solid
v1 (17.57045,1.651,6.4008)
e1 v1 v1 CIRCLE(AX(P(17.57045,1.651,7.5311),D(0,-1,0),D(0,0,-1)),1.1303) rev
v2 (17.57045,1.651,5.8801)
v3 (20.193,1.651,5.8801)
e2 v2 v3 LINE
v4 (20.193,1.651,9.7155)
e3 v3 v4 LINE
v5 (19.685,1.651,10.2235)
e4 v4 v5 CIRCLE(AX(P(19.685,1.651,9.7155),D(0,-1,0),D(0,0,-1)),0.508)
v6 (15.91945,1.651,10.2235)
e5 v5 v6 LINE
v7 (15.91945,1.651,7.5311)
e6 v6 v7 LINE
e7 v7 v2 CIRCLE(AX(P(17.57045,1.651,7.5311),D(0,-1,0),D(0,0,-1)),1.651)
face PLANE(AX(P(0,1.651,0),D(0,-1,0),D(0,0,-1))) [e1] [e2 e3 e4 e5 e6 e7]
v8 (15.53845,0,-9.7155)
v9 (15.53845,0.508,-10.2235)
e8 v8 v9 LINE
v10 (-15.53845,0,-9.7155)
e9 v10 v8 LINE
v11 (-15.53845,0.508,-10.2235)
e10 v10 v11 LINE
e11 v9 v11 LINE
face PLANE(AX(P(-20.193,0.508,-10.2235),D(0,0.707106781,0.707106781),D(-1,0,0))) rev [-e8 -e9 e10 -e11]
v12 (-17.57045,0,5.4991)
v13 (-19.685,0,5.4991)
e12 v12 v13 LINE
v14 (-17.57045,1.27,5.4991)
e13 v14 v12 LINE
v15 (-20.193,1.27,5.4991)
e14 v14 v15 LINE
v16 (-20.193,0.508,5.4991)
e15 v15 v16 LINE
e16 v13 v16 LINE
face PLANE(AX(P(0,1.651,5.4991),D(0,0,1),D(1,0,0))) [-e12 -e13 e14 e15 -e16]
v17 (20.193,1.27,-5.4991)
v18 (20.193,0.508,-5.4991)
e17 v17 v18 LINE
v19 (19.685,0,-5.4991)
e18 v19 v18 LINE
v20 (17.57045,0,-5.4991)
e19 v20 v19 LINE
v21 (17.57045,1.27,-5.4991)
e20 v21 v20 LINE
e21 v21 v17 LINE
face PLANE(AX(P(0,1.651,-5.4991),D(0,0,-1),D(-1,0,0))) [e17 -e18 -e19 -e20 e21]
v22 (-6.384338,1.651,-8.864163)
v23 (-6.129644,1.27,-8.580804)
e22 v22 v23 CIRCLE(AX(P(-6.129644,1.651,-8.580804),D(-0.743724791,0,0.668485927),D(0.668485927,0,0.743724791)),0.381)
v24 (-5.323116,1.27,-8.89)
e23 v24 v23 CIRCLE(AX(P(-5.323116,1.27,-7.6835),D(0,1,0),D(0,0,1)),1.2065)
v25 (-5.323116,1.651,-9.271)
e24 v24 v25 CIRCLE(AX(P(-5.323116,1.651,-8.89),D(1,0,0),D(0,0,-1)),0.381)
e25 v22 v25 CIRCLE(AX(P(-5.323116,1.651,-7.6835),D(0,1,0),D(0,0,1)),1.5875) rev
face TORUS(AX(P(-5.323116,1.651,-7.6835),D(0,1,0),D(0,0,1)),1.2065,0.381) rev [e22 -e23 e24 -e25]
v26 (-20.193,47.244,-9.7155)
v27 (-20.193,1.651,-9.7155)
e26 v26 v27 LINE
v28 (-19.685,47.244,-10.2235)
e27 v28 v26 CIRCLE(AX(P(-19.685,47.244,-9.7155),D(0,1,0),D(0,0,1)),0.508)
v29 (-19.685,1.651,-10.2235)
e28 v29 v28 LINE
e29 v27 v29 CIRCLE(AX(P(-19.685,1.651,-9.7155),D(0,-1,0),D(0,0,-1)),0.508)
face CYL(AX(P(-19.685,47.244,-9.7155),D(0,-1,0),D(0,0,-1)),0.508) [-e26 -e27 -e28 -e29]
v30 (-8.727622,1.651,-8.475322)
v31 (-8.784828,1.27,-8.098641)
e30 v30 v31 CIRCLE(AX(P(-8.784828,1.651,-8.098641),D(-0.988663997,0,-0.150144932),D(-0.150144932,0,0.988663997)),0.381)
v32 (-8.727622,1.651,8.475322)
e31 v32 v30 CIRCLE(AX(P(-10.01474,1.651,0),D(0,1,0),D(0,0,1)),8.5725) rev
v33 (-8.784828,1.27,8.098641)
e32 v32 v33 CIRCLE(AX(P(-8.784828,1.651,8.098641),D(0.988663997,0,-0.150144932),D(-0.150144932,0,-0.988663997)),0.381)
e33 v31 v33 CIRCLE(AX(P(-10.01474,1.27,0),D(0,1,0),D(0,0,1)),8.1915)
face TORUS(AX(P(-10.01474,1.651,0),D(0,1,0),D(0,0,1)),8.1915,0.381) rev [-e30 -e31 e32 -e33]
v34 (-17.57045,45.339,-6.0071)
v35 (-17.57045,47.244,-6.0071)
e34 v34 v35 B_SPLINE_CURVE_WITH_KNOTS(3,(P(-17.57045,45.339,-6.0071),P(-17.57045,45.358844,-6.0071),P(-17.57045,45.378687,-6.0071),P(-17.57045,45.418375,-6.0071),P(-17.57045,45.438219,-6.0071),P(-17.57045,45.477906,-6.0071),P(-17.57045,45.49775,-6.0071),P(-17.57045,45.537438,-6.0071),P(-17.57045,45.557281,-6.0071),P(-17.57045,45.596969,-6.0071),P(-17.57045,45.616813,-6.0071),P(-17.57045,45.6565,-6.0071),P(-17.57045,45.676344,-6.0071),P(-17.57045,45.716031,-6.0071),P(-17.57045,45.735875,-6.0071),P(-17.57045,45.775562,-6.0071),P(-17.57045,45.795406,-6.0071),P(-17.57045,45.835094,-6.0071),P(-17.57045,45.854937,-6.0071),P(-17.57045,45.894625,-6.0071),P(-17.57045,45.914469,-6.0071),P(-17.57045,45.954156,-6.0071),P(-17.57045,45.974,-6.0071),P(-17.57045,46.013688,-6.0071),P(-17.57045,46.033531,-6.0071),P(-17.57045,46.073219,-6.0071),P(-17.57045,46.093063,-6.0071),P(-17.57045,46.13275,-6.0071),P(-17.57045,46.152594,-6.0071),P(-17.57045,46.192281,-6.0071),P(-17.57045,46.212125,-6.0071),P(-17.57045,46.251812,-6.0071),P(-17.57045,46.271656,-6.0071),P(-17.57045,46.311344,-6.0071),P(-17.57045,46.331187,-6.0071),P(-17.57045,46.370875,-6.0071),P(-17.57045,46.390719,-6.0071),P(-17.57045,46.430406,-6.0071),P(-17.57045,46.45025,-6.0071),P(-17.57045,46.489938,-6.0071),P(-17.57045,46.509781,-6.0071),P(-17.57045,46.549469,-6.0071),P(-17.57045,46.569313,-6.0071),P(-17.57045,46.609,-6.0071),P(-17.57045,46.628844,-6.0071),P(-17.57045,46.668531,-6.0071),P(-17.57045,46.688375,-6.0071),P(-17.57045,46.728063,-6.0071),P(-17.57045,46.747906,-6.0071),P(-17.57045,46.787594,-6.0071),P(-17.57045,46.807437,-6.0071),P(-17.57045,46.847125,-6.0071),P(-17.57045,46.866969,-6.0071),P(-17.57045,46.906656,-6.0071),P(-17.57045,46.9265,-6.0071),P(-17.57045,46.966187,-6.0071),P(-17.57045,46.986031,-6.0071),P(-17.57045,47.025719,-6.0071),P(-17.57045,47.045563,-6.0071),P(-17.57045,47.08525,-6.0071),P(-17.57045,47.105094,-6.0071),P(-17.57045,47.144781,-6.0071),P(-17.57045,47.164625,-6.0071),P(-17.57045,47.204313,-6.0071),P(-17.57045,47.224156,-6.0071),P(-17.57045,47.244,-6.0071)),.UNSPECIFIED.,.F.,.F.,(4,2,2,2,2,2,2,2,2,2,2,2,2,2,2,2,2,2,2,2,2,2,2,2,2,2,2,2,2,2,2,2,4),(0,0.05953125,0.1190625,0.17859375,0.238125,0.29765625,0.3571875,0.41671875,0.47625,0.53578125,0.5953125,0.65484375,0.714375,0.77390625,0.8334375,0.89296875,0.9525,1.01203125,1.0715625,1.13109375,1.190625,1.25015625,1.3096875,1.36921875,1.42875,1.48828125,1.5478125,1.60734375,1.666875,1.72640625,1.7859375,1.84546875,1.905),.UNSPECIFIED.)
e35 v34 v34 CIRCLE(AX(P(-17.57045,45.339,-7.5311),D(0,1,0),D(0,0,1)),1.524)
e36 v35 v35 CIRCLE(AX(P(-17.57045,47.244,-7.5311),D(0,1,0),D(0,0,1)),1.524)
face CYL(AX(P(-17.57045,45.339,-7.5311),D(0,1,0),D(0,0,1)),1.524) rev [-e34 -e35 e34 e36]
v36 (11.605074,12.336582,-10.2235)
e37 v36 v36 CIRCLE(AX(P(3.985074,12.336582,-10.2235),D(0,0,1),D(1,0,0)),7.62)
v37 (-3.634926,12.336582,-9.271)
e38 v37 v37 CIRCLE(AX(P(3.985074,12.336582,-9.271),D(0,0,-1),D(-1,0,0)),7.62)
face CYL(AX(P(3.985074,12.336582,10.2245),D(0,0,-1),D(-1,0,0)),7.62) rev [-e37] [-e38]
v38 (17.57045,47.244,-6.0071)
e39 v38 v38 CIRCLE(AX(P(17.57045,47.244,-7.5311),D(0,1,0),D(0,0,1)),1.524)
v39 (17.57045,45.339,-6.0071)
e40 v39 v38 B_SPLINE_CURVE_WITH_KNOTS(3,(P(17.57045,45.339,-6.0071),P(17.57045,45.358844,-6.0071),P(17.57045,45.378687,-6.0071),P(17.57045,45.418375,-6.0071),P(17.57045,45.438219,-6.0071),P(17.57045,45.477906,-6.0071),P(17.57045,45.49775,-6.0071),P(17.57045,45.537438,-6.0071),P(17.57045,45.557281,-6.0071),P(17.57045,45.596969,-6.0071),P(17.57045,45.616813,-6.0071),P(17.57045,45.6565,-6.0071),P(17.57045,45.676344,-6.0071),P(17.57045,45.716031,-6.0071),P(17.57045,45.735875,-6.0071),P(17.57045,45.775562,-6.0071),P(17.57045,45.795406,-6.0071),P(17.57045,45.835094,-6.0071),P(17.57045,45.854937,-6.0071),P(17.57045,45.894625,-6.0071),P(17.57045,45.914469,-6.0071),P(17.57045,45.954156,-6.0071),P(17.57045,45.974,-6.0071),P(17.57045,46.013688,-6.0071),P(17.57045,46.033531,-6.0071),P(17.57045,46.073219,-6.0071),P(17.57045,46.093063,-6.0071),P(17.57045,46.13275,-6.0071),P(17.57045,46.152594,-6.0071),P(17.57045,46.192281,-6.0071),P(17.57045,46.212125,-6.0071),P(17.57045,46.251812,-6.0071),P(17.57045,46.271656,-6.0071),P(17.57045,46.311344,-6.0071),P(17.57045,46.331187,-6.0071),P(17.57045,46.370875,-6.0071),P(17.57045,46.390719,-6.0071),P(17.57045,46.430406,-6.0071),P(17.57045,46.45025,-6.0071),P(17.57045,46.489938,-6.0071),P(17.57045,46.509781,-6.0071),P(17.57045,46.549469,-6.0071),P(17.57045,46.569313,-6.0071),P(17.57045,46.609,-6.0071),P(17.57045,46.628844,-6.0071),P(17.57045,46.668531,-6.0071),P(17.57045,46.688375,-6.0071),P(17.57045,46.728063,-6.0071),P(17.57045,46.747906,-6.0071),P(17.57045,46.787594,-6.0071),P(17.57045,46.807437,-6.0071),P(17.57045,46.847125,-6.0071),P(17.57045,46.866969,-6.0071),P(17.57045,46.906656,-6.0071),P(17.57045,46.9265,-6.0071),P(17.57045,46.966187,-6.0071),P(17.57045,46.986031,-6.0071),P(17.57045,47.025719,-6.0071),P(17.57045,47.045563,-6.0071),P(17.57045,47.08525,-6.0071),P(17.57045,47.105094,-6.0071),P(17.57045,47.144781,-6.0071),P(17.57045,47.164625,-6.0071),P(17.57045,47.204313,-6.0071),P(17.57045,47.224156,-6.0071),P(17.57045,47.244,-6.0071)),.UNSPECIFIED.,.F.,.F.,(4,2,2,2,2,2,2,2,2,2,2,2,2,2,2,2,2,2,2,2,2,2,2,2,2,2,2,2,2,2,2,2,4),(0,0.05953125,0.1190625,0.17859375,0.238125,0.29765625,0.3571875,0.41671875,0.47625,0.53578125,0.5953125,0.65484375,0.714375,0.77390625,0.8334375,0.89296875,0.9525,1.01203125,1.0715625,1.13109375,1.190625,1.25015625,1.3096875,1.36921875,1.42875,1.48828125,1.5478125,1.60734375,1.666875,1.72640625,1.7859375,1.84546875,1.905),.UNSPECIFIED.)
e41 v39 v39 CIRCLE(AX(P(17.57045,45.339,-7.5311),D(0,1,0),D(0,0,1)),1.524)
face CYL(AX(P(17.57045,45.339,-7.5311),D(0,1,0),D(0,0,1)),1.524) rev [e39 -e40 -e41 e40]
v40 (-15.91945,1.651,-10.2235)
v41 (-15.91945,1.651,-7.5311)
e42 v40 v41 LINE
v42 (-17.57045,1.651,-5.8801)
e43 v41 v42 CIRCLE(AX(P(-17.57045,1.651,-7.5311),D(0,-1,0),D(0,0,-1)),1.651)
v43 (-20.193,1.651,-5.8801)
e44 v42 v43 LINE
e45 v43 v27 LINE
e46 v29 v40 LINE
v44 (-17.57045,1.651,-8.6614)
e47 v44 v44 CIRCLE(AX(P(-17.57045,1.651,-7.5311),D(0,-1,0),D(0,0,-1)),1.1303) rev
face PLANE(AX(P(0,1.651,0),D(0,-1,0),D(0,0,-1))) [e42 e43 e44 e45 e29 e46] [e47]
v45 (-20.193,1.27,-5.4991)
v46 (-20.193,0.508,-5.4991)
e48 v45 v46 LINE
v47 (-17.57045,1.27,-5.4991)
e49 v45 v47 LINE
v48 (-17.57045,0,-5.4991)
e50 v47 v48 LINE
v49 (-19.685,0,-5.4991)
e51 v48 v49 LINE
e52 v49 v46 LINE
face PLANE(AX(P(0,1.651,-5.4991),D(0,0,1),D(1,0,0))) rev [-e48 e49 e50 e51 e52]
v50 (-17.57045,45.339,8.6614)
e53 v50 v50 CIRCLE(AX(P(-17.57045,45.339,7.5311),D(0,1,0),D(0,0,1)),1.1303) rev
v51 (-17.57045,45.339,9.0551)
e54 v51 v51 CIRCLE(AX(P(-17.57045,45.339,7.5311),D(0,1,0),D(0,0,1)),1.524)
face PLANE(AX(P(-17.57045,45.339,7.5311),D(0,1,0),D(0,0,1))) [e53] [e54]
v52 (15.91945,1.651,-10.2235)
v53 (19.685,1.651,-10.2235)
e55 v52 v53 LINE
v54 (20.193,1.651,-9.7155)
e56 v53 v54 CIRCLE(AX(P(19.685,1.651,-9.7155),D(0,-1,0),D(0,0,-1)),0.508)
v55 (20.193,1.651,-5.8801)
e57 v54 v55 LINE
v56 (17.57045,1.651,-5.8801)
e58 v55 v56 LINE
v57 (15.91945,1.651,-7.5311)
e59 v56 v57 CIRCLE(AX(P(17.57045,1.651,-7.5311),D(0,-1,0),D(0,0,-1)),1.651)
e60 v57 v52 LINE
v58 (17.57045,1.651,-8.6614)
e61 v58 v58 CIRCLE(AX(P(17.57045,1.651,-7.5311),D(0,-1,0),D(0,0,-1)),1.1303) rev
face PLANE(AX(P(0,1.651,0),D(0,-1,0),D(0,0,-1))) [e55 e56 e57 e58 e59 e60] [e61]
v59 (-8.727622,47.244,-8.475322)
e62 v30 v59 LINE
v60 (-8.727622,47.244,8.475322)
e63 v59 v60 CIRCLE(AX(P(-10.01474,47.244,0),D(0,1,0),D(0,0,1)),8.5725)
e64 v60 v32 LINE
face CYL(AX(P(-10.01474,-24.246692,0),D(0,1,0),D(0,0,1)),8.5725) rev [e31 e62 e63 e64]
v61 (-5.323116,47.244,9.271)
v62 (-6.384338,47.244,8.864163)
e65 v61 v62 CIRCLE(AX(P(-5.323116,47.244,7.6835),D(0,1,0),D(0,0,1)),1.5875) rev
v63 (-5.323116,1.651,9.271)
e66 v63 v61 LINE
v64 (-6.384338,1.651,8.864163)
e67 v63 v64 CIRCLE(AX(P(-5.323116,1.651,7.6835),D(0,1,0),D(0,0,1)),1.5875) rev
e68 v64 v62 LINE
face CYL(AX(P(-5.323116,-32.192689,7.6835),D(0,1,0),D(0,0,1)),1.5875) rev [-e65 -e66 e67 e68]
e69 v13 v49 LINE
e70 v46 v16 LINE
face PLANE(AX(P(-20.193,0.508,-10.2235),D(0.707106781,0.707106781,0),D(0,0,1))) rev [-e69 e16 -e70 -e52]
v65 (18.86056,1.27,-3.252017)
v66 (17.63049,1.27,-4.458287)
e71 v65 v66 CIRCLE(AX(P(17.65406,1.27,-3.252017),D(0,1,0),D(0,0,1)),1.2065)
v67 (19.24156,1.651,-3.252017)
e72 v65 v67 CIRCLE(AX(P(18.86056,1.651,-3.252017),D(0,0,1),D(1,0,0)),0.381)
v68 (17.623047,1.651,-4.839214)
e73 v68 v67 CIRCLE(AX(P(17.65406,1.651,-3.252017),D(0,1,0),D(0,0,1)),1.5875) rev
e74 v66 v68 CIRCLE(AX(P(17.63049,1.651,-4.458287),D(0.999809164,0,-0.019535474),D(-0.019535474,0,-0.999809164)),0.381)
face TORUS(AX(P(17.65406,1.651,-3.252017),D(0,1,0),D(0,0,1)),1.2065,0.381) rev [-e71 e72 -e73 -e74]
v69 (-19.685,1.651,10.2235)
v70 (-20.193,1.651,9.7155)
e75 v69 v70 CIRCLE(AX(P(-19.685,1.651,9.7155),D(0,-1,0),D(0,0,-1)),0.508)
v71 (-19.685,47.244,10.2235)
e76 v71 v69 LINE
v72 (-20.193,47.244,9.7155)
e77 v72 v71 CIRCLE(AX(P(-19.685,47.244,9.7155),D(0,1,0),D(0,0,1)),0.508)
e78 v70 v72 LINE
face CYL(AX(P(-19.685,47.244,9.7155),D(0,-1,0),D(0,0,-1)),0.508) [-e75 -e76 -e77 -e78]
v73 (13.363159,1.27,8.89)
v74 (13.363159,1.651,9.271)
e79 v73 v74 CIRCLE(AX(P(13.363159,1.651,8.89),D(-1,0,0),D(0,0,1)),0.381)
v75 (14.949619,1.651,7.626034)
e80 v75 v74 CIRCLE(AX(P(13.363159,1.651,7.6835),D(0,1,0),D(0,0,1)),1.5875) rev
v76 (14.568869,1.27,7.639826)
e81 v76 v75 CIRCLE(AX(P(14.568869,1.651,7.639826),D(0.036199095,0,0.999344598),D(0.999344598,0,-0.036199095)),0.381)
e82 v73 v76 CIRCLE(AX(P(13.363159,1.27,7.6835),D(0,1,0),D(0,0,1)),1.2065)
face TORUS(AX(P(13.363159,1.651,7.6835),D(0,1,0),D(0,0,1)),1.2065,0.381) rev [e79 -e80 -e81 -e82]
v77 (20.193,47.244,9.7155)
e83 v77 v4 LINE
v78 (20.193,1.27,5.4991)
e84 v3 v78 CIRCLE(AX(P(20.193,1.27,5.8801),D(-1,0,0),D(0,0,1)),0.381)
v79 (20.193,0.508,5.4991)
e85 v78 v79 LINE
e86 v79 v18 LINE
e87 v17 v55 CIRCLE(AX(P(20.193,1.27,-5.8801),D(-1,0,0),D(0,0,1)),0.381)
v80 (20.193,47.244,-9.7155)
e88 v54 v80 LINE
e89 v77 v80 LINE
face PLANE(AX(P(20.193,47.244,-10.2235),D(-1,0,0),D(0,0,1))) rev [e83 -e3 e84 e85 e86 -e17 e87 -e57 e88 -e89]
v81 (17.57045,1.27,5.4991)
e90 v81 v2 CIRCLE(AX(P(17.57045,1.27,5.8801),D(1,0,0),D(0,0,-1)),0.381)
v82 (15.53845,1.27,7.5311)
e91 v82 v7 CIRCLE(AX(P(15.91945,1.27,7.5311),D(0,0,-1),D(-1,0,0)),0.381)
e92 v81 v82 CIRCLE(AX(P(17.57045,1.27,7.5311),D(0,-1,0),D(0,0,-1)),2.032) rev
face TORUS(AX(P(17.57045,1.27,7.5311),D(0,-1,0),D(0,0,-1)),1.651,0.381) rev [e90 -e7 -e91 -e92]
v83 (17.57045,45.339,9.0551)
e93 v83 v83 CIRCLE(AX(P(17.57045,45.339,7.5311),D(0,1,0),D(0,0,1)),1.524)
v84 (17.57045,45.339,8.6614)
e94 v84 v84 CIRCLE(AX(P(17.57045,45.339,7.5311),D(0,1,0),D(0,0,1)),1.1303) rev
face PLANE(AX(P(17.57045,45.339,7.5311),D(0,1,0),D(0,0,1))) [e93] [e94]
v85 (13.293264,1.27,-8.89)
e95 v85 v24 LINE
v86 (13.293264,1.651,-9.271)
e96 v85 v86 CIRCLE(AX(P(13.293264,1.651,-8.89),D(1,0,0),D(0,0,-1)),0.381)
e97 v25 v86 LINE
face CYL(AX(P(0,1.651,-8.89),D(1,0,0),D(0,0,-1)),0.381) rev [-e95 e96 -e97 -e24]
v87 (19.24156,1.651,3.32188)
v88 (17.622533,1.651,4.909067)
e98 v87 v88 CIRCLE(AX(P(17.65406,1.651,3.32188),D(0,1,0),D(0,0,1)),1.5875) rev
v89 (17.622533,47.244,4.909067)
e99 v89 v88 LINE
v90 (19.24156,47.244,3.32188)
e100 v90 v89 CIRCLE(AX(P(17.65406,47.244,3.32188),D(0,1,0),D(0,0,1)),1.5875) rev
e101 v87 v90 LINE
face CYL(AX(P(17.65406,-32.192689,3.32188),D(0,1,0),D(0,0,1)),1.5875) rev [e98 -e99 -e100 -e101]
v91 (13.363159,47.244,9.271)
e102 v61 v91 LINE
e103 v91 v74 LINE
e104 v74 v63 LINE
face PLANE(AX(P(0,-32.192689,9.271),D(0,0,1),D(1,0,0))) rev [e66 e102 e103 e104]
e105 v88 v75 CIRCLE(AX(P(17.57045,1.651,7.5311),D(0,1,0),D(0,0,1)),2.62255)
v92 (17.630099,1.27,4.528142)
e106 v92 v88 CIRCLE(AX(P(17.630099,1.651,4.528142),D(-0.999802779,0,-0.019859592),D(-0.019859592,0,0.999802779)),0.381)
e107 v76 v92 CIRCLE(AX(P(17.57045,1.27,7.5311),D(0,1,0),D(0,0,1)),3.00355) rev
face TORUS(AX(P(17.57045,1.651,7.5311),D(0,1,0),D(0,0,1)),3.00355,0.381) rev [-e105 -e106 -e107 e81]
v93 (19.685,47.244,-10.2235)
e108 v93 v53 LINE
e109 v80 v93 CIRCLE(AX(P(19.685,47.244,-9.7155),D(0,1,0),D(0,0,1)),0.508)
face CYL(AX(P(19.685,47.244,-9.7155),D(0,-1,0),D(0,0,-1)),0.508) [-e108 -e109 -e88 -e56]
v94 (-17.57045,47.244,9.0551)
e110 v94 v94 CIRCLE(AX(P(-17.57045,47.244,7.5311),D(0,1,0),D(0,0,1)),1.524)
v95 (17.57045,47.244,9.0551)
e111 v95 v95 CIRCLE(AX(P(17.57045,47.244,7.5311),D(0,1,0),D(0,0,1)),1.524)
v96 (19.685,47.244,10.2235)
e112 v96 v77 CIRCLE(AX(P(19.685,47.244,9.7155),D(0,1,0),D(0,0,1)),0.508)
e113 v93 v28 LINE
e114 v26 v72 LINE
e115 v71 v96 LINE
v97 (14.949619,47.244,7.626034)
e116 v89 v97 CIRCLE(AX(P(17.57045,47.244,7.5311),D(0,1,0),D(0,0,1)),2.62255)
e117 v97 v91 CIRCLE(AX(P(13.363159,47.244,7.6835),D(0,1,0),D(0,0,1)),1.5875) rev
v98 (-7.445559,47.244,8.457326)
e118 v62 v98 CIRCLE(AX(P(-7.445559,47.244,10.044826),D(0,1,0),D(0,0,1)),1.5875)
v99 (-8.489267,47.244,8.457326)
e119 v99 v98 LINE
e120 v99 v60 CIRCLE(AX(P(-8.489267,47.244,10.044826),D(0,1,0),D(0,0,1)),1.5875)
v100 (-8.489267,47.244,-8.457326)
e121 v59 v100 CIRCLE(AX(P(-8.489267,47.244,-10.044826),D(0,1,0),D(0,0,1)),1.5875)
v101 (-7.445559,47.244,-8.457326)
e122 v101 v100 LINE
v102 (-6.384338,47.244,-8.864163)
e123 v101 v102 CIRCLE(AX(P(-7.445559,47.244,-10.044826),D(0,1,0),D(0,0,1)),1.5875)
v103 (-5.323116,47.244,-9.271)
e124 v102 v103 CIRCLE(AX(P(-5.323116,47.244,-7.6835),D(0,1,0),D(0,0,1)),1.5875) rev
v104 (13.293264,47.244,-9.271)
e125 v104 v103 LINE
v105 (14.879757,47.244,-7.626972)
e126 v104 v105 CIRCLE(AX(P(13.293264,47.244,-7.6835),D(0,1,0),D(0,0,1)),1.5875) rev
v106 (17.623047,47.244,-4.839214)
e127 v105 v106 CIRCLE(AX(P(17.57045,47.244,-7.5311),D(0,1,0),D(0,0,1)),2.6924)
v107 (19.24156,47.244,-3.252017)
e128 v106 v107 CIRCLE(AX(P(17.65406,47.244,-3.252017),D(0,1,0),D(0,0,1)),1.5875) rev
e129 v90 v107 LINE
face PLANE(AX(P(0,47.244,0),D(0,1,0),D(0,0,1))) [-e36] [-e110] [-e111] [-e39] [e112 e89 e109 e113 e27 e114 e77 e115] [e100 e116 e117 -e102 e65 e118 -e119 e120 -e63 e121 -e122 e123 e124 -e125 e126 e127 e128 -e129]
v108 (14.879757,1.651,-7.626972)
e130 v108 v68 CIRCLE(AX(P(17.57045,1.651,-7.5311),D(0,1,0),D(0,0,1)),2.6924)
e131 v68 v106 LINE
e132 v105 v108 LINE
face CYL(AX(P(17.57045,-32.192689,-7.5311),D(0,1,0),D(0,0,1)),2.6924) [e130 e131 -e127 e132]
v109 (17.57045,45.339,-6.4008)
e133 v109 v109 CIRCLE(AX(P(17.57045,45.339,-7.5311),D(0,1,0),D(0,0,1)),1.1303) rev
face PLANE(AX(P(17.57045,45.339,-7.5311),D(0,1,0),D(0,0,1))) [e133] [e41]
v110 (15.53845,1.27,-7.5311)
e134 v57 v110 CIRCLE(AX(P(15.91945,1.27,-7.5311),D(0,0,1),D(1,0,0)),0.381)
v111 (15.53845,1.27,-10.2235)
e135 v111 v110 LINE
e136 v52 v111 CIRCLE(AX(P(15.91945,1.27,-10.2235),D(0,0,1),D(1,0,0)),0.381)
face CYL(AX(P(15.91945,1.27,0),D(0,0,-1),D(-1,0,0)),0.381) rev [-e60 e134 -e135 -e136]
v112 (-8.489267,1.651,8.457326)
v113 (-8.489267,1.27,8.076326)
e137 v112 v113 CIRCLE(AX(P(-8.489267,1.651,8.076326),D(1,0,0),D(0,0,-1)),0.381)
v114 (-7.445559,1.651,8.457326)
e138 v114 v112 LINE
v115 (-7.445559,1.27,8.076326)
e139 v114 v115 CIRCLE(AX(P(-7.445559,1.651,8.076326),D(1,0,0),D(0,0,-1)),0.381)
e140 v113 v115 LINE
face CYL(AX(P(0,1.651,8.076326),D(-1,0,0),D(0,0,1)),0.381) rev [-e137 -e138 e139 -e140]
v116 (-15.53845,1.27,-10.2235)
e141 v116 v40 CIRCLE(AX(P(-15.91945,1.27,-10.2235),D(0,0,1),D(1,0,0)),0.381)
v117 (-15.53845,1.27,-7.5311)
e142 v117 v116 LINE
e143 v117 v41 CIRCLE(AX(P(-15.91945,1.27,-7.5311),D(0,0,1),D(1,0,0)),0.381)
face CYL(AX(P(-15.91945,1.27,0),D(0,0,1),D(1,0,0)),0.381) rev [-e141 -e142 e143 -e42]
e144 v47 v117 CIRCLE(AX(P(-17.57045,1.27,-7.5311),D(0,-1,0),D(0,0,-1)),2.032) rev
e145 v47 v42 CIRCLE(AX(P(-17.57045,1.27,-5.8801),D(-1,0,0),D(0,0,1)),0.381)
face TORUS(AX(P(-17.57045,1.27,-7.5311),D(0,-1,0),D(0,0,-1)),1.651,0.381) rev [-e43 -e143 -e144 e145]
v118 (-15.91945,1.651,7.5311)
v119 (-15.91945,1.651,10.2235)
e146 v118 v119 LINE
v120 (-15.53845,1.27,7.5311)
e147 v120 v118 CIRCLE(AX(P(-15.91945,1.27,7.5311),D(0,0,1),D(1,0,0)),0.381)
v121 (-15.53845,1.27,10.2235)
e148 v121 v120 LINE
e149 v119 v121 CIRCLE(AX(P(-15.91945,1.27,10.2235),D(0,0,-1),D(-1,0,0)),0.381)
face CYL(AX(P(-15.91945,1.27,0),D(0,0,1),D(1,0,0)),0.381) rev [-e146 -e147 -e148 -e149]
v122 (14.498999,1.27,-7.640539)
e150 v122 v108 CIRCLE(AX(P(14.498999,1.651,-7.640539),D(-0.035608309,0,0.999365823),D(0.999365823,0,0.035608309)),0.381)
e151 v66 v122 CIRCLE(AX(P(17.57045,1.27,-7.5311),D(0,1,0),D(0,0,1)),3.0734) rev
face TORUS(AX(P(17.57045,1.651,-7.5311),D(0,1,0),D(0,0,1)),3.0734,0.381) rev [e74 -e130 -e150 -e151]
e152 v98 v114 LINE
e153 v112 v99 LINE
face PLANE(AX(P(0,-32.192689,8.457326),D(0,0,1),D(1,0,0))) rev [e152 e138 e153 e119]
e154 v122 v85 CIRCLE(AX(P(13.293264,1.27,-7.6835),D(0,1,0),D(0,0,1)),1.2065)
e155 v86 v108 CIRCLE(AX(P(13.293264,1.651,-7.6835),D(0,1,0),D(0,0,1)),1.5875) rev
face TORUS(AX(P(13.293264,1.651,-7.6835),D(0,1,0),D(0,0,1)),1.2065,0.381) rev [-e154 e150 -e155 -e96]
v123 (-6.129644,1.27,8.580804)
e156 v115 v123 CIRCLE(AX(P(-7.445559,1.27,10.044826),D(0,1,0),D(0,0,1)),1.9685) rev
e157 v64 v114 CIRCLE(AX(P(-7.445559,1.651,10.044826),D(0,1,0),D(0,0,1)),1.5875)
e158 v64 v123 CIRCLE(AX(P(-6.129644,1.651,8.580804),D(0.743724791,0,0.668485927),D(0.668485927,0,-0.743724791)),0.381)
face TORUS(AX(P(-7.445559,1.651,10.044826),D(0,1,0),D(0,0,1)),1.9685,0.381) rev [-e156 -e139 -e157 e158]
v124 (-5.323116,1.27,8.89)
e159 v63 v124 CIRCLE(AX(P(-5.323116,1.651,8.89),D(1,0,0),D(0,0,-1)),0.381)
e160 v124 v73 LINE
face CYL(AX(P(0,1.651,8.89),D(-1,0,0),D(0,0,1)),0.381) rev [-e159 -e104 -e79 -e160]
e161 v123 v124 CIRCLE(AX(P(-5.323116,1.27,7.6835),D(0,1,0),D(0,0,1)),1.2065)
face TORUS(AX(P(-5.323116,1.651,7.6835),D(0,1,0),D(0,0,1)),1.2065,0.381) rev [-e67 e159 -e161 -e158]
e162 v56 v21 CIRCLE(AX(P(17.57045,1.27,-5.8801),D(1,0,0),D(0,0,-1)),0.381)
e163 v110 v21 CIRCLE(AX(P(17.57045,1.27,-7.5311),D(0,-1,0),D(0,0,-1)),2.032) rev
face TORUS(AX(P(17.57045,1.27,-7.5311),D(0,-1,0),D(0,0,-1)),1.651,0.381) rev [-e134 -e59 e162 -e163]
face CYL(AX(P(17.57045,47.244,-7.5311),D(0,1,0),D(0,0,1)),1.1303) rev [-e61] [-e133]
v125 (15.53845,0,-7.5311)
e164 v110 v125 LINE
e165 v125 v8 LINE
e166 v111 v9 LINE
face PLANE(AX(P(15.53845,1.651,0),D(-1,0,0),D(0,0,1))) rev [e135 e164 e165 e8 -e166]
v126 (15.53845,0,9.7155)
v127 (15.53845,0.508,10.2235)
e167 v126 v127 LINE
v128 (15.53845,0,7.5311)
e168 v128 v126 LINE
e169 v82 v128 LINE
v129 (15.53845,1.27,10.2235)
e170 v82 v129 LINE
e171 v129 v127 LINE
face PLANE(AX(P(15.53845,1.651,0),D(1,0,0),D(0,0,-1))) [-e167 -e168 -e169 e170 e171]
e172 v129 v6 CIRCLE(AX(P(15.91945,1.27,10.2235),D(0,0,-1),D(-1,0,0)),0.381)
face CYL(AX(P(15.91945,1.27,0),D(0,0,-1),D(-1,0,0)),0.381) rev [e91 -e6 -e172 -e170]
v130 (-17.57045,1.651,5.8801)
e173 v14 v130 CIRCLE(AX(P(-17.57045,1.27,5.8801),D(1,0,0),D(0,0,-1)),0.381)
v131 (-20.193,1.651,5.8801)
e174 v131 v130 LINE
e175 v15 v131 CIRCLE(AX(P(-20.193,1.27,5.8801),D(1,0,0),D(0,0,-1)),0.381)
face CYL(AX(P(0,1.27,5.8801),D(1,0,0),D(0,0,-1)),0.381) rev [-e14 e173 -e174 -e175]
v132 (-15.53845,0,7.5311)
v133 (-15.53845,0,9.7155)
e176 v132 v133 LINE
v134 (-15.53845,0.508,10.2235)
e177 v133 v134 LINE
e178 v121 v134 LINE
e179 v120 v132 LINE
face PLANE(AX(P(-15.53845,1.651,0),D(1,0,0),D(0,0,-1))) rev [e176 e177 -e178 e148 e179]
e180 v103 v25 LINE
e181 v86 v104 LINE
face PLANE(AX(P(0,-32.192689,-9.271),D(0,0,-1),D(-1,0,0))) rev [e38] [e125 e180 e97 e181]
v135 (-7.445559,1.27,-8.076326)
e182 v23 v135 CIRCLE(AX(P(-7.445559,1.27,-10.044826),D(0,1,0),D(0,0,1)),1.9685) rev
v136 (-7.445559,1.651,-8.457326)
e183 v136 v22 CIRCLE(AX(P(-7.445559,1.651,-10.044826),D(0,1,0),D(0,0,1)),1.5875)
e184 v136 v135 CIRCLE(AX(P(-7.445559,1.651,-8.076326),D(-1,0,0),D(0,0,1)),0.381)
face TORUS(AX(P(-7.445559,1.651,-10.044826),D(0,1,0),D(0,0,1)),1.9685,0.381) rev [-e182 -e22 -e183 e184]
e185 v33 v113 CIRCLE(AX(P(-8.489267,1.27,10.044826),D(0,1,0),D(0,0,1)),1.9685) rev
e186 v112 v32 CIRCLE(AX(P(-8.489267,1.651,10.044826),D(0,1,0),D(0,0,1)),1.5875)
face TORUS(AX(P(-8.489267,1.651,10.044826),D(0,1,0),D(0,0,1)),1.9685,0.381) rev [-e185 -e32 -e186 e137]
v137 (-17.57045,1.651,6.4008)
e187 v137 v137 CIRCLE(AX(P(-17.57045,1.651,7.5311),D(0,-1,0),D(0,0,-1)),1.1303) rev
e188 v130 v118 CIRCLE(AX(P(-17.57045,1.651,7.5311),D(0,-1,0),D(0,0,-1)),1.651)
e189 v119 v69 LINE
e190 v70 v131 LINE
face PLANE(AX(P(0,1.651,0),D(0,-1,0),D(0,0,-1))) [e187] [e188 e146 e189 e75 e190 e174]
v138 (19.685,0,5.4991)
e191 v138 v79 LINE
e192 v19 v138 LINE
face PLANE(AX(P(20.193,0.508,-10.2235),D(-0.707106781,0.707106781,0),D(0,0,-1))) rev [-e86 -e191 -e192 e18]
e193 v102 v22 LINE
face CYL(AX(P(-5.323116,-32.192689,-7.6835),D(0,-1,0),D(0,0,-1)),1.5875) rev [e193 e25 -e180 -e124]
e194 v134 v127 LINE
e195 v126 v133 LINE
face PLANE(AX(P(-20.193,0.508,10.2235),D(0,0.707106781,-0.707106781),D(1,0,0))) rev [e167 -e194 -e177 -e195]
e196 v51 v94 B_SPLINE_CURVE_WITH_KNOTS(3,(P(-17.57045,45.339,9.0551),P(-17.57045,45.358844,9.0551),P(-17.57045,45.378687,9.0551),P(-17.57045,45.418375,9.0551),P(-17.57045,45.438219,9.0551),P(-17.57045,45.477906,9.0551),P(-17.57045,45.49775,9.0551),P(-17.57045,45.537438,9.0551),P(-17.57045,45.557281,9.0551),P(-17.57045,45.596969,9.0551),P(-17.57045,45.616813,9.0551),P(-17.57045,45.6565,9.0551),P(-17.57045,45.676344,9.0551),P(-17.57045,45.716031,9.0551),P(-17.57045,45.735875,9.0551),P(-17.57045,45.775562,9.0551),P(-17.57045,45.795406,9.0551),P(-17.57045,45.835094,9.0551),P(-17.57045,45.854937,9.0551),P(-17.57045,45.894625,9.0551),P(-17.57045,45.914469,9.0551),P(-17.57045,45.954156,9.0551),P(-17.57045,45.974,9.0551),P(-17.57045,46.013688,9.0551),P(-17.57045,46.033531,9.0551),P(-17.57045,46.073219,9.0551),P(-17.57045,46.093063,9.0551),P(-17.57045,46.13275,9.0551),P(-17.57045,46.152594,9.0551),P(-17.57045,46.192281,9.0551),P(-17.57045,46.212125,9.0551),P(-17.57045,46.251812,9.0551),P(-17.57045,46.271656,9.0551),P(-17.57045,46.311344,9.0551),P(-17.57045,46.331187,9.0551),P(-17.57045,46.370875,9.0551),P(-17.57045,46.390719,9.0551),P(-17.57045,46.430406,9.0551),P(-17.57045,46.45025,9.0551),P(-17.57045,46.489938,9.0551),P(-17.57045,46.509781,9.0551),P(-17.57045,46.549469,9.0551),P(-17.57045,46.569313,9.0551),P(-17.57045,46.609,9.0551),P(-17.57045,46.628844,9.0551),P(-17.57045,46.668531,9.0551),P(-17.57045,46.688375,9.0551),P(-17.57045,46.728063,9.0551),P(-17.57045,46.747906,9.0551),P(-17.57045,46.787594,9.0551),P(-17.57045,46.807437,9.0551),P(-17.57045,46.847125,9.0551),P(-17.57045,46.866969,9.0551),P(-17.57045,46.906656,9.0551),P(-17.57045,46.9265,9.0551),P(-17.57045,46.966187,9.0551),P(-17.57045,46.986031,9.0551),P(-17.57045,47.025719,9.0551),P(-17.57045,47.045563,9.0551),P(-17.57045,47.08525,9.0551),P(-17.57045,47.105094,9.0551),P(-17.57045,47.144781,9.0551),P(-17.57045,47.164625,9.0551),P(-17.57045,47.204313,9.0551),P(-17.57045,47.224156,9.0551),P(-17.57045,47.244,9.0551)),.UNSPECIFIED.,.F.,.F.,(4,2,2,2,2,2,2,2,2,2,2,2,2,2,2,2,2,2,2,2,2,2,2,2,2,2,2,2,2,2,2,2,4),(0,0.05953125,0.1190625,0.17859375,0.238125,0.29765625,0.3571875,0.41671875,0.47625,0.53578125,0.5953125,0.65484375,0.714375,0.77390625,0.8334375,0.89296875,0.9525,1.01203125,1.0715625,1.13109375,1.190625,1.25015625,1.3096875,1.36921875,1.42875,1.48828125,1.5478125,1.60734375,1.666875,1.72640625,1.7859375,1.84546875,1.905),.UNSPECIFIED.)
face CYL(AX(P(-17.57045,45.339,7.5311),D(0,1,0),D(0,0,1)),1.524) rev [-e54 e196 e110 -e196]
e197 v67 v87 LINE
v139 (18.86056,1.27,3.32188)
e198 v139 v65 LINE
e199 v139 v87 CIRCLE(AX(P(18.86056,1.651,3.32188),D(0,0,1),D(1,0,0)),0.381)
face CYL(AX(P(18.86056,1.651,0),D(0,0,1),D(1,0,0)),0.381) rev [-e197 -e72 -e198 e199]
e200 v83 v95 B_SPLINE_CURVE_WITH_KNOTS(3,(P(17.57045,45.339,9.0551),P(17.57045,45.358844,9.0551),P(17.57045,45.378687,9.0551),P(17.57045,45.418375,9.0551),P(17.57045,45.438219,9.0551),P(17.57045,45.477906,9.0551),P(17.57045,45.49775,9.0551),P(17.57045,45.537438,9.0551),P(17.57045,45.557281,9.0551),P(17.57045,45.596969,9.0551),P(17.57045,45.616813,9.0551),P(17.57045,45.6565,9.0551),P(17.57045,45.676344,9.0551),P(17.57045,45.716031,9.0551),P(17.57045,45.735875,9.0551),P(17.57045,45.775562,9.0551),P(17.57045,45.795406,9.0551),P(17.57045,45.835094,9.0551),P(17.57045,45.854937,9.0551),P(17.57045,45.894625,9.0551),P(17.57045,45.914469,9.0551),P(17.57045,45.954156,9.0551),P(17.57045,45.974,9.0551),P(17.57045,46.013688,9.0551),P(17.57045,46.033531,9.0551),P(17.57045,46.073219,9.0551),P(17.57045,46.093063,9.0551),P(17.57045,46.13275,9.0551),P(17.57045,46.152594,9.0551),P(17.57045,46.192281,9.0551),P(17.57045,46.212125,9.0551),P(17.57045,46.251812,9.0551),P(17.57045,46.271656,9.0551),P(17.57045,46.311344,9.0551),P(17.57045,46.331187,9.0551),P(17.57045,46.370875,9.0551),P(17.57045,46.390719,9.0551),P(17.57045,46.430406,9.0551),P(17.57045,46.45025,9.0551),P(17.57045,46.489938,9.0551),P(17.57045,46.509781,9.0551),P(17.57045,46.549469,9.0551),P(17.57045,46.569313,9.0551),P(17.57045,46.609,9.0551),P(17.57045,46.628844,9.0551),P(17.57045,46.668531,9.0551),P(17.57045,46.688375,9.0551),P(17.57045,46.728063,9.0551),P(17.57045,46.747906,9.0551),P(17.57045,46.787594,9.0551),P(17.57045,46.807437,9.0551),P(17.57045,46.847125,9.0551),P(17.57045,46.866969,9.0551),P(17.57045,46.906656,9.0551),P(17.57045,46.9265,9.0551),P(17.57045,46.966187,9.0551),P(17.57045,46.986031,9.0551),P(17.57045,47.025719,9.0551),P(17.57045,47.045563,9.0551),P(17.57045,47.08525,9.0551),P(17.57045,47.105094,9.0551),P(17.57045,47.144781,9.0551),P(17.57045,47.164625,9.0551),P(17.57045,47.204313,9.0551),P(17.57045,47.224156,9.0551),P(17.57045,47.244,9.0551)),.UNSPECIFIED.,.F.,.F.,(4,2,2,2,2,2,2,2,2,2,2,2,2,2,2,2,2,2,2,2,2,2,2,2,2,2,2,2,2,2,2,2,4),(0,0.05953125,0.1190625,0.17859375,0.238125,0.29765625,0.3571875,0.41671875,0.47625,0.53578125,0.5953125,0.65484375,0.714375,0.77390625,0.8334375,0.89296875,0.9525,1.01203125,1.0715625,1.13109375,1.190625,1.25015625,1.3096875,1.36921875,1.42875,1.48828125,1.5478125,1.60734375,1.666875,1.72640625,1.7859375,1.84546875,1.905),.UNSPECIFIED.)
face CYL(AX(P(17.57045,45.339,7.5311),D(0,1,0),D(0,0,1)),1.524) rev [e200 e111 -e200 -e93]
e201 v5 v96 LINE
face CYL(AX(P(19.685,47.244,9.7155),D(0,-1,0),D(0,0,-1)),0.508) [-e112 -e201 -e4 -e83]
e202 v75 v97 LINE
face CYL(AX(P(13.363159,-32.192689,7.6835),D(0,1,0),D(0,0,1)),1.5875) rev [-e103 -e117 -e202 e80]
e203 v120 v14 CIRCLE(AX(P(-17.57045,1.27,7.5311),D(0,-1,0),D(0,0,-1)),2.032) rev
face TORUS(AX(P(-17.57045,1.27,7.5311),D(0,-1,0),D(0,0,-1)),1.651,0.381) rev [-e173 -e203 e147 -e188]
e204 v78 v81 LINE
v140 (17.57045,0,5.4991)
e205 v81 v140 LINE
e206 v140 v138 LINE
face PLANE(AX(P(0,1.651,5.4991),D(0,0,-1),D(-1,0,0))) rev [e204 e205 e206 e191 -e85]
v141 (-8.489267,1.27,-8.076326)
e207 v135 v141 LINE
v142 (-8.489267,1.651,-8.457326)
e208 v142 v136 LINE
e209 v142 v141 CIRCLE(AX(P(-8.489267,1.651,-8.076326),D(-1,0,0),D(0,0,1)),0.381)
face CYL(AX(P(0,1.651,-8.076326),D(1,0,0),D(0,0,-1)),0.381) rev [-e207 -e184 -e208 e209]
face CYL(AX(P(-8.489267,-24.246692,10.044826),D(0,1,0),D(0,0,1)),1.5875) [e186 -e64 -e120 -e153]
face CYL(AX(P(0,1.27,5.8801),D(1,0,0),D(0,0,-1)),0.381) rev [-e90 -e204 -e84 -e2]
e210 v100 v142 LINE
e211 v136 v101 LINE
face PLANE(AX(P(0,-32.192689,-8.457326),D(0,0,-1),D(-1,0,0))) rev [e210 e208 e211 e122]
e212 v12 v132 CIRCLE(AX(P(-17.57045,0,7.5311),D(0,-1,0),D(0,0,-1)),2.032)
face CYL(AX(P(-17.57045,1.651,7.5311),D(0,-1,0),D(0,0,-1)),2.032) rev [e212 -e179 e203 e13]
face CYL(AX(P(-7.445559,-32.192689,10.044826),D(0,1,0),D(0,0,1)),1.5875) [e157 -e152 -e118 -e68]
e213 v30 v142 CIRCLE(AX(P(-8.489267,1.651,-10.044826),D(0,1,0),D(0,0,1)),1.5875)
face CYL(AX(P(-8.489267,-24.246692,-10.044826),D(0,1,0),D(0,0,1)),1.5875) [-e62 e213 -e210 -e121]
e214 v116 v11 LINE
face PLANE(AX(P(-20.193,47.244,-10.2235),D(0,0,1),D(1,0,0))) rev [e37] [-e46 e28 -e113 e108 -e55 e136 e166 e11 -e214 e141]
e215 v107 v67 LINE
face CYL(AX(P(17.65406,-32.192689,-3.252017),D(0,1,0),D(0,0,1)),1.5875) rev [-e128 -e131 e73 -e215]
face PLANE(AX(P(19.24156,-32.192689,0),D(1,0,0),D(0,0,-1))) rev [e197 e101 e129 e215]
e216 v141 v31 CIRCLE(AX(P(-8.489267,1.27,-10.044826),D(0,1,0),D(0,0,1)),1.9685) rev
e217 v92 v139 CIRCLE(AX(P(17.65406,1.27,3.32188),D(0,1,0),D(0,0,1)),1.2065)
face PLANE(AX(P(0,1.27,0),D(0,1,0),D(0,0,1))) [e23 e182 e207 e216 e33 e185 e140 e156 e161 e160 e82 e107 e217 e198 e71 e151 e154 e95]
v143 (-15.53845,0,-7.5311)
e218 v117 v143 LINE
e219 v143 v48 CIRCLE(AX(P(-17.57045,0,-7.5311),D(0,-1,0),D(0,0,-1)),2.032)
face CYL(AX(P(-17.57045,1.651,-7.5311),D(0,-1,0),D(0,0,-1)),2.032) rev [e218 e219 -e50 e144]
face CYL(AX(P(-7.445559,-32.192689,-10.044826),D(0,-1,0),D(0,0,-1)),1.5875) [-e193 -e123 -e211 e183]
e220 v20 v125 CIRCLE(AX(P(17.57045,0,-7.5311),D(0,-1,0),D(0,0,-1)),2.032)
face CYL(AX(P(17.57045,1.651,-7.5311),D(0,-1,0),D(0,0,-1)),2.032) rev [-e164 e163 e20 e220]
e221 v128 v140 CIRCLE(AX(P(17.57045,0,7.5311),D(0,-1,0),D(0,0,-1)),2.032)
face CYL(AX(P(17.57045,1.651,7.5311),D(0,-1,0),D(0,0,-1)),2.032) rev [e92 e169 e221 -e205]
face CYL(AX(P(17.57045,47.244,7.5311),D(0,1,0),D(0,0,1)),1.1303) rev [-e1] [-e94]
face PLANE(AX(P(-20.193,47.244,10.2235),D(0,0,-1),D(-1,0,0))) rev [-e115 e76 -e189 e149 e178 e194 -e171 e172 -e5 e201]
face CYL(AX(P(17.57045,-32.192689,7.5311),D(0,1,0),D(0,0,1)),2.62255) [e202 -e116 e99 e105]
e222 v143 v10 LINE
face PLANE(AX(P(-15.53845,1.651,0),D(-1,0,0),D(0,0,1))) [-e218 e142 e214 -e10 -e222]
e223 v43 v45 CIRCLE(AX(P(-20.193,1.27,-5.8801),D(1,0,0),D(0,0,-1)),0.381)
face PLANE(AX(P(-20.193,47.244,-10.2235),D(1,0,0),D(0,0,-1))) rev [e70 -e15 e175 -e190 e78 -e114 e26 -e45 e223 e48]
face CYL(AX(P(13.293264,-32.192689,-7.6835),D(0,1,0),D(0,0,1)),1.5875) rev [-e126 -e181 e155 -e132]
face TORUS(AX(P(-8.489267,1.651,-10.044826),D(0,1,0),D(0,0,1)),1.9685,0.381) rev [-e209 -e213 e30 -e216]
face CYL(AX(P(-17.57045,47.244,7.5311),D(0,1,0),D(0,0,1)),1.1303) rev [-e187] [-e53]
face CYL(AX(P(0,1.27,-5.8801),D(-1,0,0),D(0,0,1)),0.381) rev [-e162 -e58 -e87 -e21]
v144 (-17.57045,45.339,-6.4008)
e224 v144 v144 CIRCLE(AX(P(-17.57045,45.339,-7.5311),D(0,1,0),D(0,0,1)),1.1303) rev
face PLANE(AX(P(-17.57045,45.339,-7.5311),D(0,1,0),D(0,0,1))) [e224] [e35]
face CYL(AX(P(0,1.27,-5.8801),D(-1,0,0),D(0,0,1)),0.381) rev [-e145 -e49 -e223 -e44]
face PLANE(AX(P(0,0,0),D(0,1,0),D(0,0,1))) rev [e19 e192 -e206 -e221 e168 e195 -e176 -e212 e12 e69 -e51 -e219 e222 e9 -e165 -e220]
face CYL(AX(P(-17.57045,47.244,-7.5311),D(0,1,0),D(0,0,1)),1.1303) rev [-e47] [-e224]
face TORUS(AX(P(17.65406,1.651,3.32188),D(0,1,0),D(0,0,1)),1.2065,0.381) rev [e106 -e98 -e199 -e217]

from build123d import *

# Parameters (mm, degrees)
SKETCH1_W             = 40.386
SKETCH1_H             = 20.447
BOSS_EXTRUDE1_DEPTH   = 47.244
FILLET1_R             = 0.508
CHAMFER1_SIZE         = 0.508
F_2_CLEARANCE_HOLE1_D = 2.2606
SKETCH6_R             = 8.5725
CUT_EXTRUDE1_DEPTH    = 45.974
SKETCH8_R             = 1.524
CUT_EXTRUDE2_DEPTH    = 1.905
CUT_EXTRUDE4_DEPTH    = 45.974
FILLET3_R             = 1.5875
FILLET6_R             = 1.5875
FILLET4_R             = 0.381
SKETCH9_R             = 1.1303
CUT_EXTRUDE5_DEPTH    = 1.651
FILLET5_R             = 0.381
CUT_EXTRUDE8_REACH    = 61.664
SKETCH12_R            = 7.62


with BuildPart() as part:
    # Sketch1 → Boss-Extrude1 (new body)
    with BuildSketch(Plane(origin=(0, 0, 0), x_dir=(1, 0, 0), z_dir=(0, 1, 0))):
        Rectangle(SKETCH1_W, SKETCH1_H)
    extrude(amount=BOSS_EXTRUDE1_DEPTH)

    # Fillet1
    fillet1_edges = [part.edges().sort_by_distance(p)[0] for p in [
        (20.193, 23.622, 10.2235),
        (-20.193, 23.622, 10.2235),
        (-20.193, 23.622, -10.2235),
        (20.193, 23.622, -10.2235),
    ]]
    fillet(fillet1_edges, radius=FILLET1_R)

    # Chamfer1
    chamfer1_edges = [part.edges().sort_by_distance(p)[0] for p in [
        (20.193, 0, 0),
        (0, 0, 10.2235),
        (-20.193, 0, 0),
        (0, 0, -10.2235),
        (-20.044210245, 0, 10.074710245),
        (-20.044210245, 0, -10.074710245),
        (20.044210245, 0, -10.074710245),
        (20.044210245, 0, 10.074710245),
    ]]
    chamfer(chamfer1_edges, length=CHAMFER1_SIZE)

    # #2 Clearance Hole1 (through all)
    with Locations(Plane(origin=(0, 47.244, 0), x_dir=(1, 0, 0), z_dir=(0, 1, 0))):
        with Locations((17.57045, -7.5311), (-17.57045, 7.5311), (-17.57045, -7.5311), (17.57045, 7.5311)):
            Hole(F_2_CLEARANCE_HOLE1_D / 2)

    # Sketch6 → Cut-Extrude1 (cut)
    with BuildSketch(Plane(origin=(0, 47.244, 0), x_dir=(1, 0, 0), z_dir=(0, 1, 0))):
        with Locations(Location((-10.014739789, 0, 0), (0, 0, 270))):
            Circle(SKETCH6_R)
    extrude(amount=-CUT_EXTRUDE1_DEPTH, mode=Mode.SUBTRACT)

    # Sketch8 → Cut-Extrude2 (cut)
    with BuildSketch(Plane(origin=(0, 47.244, 0), x_dir=(1, 0, 0), z_dir=(0, 1, 0))):
        with Locations(Location((-17.57045, -7.5311, 0), (0, 0, 270))):
            Circle(SKETCH8_R)
        with Locations(Location((-17.57045, 7.5311, 0), (0, 0, 270))):
            Circle(SKETCH8_R)
        with Locations(Location((17.57045, 7.5311, 0), (0, 0, 270))):
            Circle(SKETCH8_R)
        with Locations(Location((17.57045, -7.5311, 0), (0, 0, 270))):
            Circle(SKETCH8_R)
    extrude(amount=-CUT_EXTRUDE2_DEPTH, mode=Mode.SUBTRACT)

    # Sketch10 → Cut-Extrude4 (cut)
    with BuildSketch(Plane(origin=(0, 47.244, 0), x_dir=(1, 0, 0), z_dir=(0, 1, 0))):
        with BuildLine():
            Line((-6.70924359, 8.457326211), (-8.61424359, 8.457326211))
            ThreePointArc((-8.61424359, 8.457326211), (-3.476639533, 5.544456808), (-1.442239789, 0))
            ThreePointArc((-1.442239789, 0), (-3.476639533, -5.544456808), (-8.61424359, -8.457326211))
            Line((-8.61424359, -8.457326211), (-6.70924359, -8.457326211))
            Line((-6.70924359, -8.457326211), (-6.70924359, -9.271))
            Line((-6.70924359, -9.271), (15.608176703, -9.271))
            ThreePointArc((15.608176703, -9.271), (15.68428435, -5.70897277), (19.241559877, -5.509922056))
            Line((19.241559877, -5.509922056), (19.241559877, 5.420079029))
            ThreePointArc((19.241559877, 5.420079029), (15.63546106, 5.658979394), (15.51575641, 9.271))
            Line((15.51575641, 9.271), (-6.70924359, 9.271))
            Line((-6.70924359, 9.271), (-6.70924359, 8.457326211))
        make_face()
    extrude(amount=-CUT_EXTRUDE4_DEPTH, mode=Mode.SUBTRACT)

    # Fillet3
    # the kernel refuses this fillet: 1.5875 mm, written as the material it adds along each edge
    with BuildSketch(Plane(origin=(-6.70924359, 47.244, -9.271), x_dir=(0, 0, 1), z_dir=(0, -1, 0))) as fillet3_piece_1:
        with BuildLine():
            CenterArc((1.5875, -1.386127427), FILLET3_R, 119.173087397, 60.826912603)
            Line((0, -1.386127427), (0, 0))
            Line((0, 0), (0.813673789, 0))
        make_face()
    extrude(amount=45.974)
    with BuildSketch(Plane(origin=(-6.70924359, 47.244, 9.271), x_dir=(1, 0, 0), z_dir=(0, -1, 0))) as fillet3_piece_2:
        with BuildLine():
            CenterArc((1.386127427, -1.5875), FILLET3_R, 90, 60.826912603)
            Line((0, -0.813673789), (0, 0))
            Line((0, 0), (1.386127427, 0))
        make_face()
    extrude(amount=45.974)
    with BuildSketch(Plane(origin=(15.608176703, 47.244, 9.271), x_dir=(-0.3716686851547393, 0, -0.9283654390784629), z_dir=(0, -1, 0))) as fillet3_piece_3:
        with BuildLine():
            CenterArc((2.30818281, -1.494172552), FILLET3_R, 109.744057683, 92.074508599)
            Line((0.834402675, -2.08419659), (0, 0))
            ThreePointArc((0, 0), (0.885947491, -0.154176944), (1.771894982, 0))
        make_face()
    extrude(amount=45.974)
    with BuildSketch(Plane(origin=(19.241559877, 47.244, 5.509922056), x_dir=(0, 0, -1), z_dir=(0, -1, 0))) as fillet3_piece_4:
        with BuildLine():
            CenterArc((2.188041745, -1.5875), FILLET3_R, 90, 91.137945638)
            ThreePointArc((0.600854834, -1.619027103), (0.437513505, -0.758638036), (0, 0))
            Line((0, 0), (2.188041745, 0))
        make_face()
    extrude(amount=45.974)
    with BuildSketch(Plane(origin=(19.241559877, 47.244, -5.420079029), x_dir=(-0.9412204258380975, 0, 0.3377929987213328), z_dir=(0, -1, 0))) as fillet3_piece_5:
        with BuildLine():
            CenterArc((2.226543682, -1.504378109), FILLET3_R, 108.623097103, 91.119371442)
            Line((0.732356256, -2.040624495), (0, 0))
            ThreePointArc((0, 0), (0.859794646, -0.140974726), (1.719589292, 0))
        make_face()
    extrude(amount=45.974)
    with BuildSketch(Plane(origin=(15.51575641, 47.244, -9.271), x_dir=(-1, 0, 0), z_dir=(0, -1, 0))) as fillet3_piece_6:
        with BuildLine():
            CenterArc((2.222492196, -1.5875), FILLET3_R, 90, 92.040637192)
            ThreePointArc((0.635998952, -1.64402819), (0.456357894, -0.768489581), (0, 0))
            Line((0, 0), (2.222492196, 0))
        make_face()
    extrude(amount=45.974)
    # the kernel refuses this fillet: 1.5875 mm, written as the material it takes off along each edge
    with BuildSketch(Plane(origin=(-8.61424359, 47.55644078, -8.457326211), x_dir=(1, 0, 0), z_dir=(0, -1, 0))) as fillet3_2_piece_1:
        with BuildLine():
            CenterArc((0.124976312, -1.5875), FILLET3_R, 90, 8.635325681)
            ThreePointArc((-0.113378768, -0.017995904), (-0.05665926, -0.009187742), (0, 0))
            Line((0, 0), (0.124976312, 0))
        make_face()
    extrude(amount=46.28644078, mode=Mode.SUBTRACT)
    with BuildSketch(Plane(origin=(-8.61424359, 47.55644078, 8.457326211), x_dir=(-0.9876365067196718, 0, 0.15676138106869192), z_dir=(0, -1, 0))) as fillet3_2_piece_2:
        with BuildLine():
            CenterArc((0.125427524, -1.587464414), FILLET3_R, 90.383639208, 8.635325681)
            Line((-0.123431168, -0.019591459), (0, 0))
            ThreePointArc((0, 0), (0.057399036, -0.000192166), (0.114798073, 0))
        make_face()
    extrude(amount=46.28644078, mode=Mode.SUBTRACT)

    # Fillet6
    fillet6_edges = [part.edges().sort_by_distance(p)[0] for p in [
        (-6.70924359, 24.257, 8.457326211),
        (-6.70924359, 24.257, -8.457326211),
    ]]
    fillet(fillet6_edges, radius=FILLET6_R)

    # Fillet4
    fillet4_edges = [part.edges().sort_by_distance(p)[0] for p in [
        (3.985074025, 1.27, -9.271),
        (-18.587239789, 1.27, 0),
        (4.020021556, 1.27, 9.271),
        (15.700932918, 1.27, 5.691895176),
        (19.241559877, 1.27, 0.034931777),
        (15.651391563, 1.27, -5.642652893),
        (-7.967413131, 1.27, -8.457326211),
        (14.435607146, 1.27, -8.785865127),
        (18.765573215, 1.27, -4.385460337),
        (18.76538948, 1.27, 4.455504042),
        (14.505827999, 1.27, 8.785527421),
        (-5.891382637, 1.27, -9.165805456),
        (-8.60878401, 1.27, -8.461831581),
        (-8.60878401, 1.27, 8.461831581),
        (-5.891382637, 1.27, 9.165805456),
        (-7.967413131, 1.27, 8.457326211),
        (-6.877292509, 1.27, 8.562520755),
        (-6.877292509, 1.27, -8.562520755),
    ]]
    fillet(fillet4_edges, radius=FILLET4_R)

    # Sketch9 → Cut-Extrude5 (cut)
    # profile 1 of 8: a face of its own
    with BuildSketch(Plane.XZ):
        with BuildLine():
            Line((-19.685, 9.7155), (-19.685, 5.4991))
            Line((-19.685, 5.4991), (-17.57045, 5.4991))
            ThreePointArc((-17.57045, 5.4991), (-16.133609021, 6.094259021), (-15.53845, 7.5311))
            Line((-15.53845, 7.5311), (-15.53845, 9.7155))
            Line((-15.53845, 9.7155), (-19.685, 9.7155))
        make_face()
        with Locations(Location((-17.57045, 7.5311, 0), (0, 0, 90))):
            Circle(SKETCH9_R, mode=Mode.SUBTRACT)
    # profile 2 of 8: a face of its own
    with BuildSketch(Plane.XZ):
        with BuildLine():
            Line((-20.193, 5.4991), (-19.685, 5.4991))
            Line((-19.685, 5.4991), (-19.685, 9.7155))
            Line((-19.685, 9.7155), (-15.53845, 9.7155))
            Line((-15.53845, 9.7155), (-15.53845, 10.2235))
            Line((-15.53845, 10.2235), (-19.685, 10.2235))
            ThreePointArc((-19.685, 10.2235), (-20.044210245, 10.074710245), (-20.193, 9.7155))
            Line((-20.193, 9.7155), (-20.193, 5.4991))
        make_face()
    # profile 3 of 8: a face of its own
    with BuildSketch(Plane.XZ):
        with BuildLine():
            ThreePointArc((-15.53845, -7.5311), (-16.133609021, -6.094259021), (-17.57045, -5.4991))
            Line((-17.57045, -5.4991), (-19.685, -5.4991))
            Line((-19.685, -5.4991), (-19.685, -9.7155))
            Line((-19.685, -9.7155), (-15.53845, -9.7155))
            Line((-15.53845, -9.7155), (-15.53845, -7.5311))
        make_face()
        with Locations(Location((-17.57045, -7.5311, 0), (0, 0, 90))):
            Circle(SKETCH9_R, mode=Mode.SUBTRACT)
    # profile 4 of 8: a face of its own
    with BuildSketch(Plane.XZ):
        with BuildLine():
            Line((-19.685, -9.7155), (-19.685, -5.4991))
            Line((-19.685, -5.4991), (-20.193, -5.4991))
            Line((-20.193, -5.4991), (-20.193, -9.7155))
            ThreePointArc((-20.193, -9.7155), (-20.044210245, -10.074710245), (-19.685, -10.2235))
            Line((-19.685, -10.2235), (-15.53845, -10.2235))
            Line((-15.53845, -10.2235), (-15.53845, -9.7155))
            Line((-15.53845, -9.7155), (-19.685, -9.7155))
        make_face()
    # profile 5 of 8: a face of its own
    with BuildSketch(Plane.XZ):
        with BuildLine():
            Line((19.685, 9.7155), (15.53845, 9.7155))
            Line((15.53845, 9.7155), (15.53845, 7.5311))
            ThreePointArc((15.53845, 7.5311), (16.133609021, 6.094259021), (17.57045, 5.4991))
            Line((17.57045, 5.4991), (19.685, 5.4991))
            Line((19.685, 5.4991), (19.685, 9.7155))
        make_face()
        with Locations(Location((17.57045, 7.5311, 0), (0, 0, 90))):
            Circle(SKETCH9_R, mode=Mode.SUBTRACT)
    # profile 6 of 8: a face of its own
    with BuildSketch(Plane.XZ):
        with BuildLine():
            Line((15.53845, 10.2235), (15.53845, 9.7155))
            Line((15.53845, 9.7155), (19.685, 9.7155))
            Line((19.685, 9.7155), (19.685, 5.4991))
            Line((19.685, 5.4991), (20.193, 5.4991))
            Line((20.193, 5.4991), (20.193, 9.7155))
            ThreePointArc((20.193, 9.7155), (20.044210245, 10.074710245), (19.685, 10.2235))
            Line((19.685, 10.2235), (15.53845, 10.2235))
        make_face()
    # profile 7 of 8: a face of its own
    with BuildSketch(Plane.XZ):
        with BuildLine():
            Line((15.53845, -7.5311), (15.53845, -9.7155))
            Line((15.53845, -9.7155), (19.685, -9.7155))
            Line((19.685, -9.7155), (19.685, -5.4991))
            Line((19.685, -5.4991), (17.57045, -5.4991))
            ThreePointArc((17.57045, -5.4991), (16.133609021, -6.094259021), (15.53845, -7.5311))
        make_face()
        with Locations(Location((17.57045, -7.5311, 0), (0, 0, 90))):
            Circle(SKETCH9_R, mode=Mode.SUBTRACT)
    # profile 8 of 8: a face of its own
    with BuildSketch(Plane.XZ):
        with BuildLine():
            Line((19.685, -9.7155), (15.53845, -9.7155))
            Line((15.53845, -9.7155), (15.53845, -10.2235))
            Line((15.53845, -10.2235), (19.685, -10.2235))
            ThreePointArc((19.685, -10.2235), (20.044210245, -10.074710245), (20.193, -9.7155))
            Line((20.193, -9.7155), (20.193, -5.4991))
            Line((20.193, -5.4991), (19.685, -5.4991))
            Line((19.685, -5.4991), (19.685, -9.7155))
        make_face()
    extrude(amount=-CUT_EXTRUDE5_DEPTH, mode=Mode.SUBTRACT)

    # Fillet5
    fillet5_edges = [part.edges().sort_by_distance(p)[0] for p in [
        (-18.881725, 1.651, -5.4991),
        (-16.133609021, 1.651, -6.094259021),
        (-15.53845, 1.651, -8.8773),
        (18.881725, 1.651, 5.4991),
        (16.133609021, 1.651, 6.094259021),
        (15.53845, 1.651, 8.8773),
        (15.53845, 1.651, -8.8773),
        (16.133609021, 1.651, -6.094259021),
        (18.881725, 1.651, -5.4991),
        (-15.53845, 1.651, 8.8773),
        (-16.133609021, 1.651, 6.094259021),
        (-18.881725, 1.651, 5.4991),
    ]]
    fillet(fillet5_edges, radius=FILLET5_R)

    # Sketch12 → Cut-Extrude8 (cut, up to next)
    with BuildSketch(Plane(origin=(9.9695, 0, -10.2235), x_dir=(1, 0, 0), z_dir=(0, 0, 1)), mode=Mode.PRIVATE) as cut_extrude8_sk1:
        with Locations(Location((-5.984425975, 12.336581723, 0), (0, 0, 180))):
            Circle(SKETCH12_R)
    cut_extrude8_tool1 = extrude(cut_extrude8_sk1.sketch, amount=CUT_EXTRUDE8_REACH, mode=Mode.PRIVATE) & part.part
    add(cut_extrude8_tool1.solids().sort_by_distance((3.985074, 12.336582, -10.2235))[0], mode=Mode.SUBTRACT)


solid = part.part
